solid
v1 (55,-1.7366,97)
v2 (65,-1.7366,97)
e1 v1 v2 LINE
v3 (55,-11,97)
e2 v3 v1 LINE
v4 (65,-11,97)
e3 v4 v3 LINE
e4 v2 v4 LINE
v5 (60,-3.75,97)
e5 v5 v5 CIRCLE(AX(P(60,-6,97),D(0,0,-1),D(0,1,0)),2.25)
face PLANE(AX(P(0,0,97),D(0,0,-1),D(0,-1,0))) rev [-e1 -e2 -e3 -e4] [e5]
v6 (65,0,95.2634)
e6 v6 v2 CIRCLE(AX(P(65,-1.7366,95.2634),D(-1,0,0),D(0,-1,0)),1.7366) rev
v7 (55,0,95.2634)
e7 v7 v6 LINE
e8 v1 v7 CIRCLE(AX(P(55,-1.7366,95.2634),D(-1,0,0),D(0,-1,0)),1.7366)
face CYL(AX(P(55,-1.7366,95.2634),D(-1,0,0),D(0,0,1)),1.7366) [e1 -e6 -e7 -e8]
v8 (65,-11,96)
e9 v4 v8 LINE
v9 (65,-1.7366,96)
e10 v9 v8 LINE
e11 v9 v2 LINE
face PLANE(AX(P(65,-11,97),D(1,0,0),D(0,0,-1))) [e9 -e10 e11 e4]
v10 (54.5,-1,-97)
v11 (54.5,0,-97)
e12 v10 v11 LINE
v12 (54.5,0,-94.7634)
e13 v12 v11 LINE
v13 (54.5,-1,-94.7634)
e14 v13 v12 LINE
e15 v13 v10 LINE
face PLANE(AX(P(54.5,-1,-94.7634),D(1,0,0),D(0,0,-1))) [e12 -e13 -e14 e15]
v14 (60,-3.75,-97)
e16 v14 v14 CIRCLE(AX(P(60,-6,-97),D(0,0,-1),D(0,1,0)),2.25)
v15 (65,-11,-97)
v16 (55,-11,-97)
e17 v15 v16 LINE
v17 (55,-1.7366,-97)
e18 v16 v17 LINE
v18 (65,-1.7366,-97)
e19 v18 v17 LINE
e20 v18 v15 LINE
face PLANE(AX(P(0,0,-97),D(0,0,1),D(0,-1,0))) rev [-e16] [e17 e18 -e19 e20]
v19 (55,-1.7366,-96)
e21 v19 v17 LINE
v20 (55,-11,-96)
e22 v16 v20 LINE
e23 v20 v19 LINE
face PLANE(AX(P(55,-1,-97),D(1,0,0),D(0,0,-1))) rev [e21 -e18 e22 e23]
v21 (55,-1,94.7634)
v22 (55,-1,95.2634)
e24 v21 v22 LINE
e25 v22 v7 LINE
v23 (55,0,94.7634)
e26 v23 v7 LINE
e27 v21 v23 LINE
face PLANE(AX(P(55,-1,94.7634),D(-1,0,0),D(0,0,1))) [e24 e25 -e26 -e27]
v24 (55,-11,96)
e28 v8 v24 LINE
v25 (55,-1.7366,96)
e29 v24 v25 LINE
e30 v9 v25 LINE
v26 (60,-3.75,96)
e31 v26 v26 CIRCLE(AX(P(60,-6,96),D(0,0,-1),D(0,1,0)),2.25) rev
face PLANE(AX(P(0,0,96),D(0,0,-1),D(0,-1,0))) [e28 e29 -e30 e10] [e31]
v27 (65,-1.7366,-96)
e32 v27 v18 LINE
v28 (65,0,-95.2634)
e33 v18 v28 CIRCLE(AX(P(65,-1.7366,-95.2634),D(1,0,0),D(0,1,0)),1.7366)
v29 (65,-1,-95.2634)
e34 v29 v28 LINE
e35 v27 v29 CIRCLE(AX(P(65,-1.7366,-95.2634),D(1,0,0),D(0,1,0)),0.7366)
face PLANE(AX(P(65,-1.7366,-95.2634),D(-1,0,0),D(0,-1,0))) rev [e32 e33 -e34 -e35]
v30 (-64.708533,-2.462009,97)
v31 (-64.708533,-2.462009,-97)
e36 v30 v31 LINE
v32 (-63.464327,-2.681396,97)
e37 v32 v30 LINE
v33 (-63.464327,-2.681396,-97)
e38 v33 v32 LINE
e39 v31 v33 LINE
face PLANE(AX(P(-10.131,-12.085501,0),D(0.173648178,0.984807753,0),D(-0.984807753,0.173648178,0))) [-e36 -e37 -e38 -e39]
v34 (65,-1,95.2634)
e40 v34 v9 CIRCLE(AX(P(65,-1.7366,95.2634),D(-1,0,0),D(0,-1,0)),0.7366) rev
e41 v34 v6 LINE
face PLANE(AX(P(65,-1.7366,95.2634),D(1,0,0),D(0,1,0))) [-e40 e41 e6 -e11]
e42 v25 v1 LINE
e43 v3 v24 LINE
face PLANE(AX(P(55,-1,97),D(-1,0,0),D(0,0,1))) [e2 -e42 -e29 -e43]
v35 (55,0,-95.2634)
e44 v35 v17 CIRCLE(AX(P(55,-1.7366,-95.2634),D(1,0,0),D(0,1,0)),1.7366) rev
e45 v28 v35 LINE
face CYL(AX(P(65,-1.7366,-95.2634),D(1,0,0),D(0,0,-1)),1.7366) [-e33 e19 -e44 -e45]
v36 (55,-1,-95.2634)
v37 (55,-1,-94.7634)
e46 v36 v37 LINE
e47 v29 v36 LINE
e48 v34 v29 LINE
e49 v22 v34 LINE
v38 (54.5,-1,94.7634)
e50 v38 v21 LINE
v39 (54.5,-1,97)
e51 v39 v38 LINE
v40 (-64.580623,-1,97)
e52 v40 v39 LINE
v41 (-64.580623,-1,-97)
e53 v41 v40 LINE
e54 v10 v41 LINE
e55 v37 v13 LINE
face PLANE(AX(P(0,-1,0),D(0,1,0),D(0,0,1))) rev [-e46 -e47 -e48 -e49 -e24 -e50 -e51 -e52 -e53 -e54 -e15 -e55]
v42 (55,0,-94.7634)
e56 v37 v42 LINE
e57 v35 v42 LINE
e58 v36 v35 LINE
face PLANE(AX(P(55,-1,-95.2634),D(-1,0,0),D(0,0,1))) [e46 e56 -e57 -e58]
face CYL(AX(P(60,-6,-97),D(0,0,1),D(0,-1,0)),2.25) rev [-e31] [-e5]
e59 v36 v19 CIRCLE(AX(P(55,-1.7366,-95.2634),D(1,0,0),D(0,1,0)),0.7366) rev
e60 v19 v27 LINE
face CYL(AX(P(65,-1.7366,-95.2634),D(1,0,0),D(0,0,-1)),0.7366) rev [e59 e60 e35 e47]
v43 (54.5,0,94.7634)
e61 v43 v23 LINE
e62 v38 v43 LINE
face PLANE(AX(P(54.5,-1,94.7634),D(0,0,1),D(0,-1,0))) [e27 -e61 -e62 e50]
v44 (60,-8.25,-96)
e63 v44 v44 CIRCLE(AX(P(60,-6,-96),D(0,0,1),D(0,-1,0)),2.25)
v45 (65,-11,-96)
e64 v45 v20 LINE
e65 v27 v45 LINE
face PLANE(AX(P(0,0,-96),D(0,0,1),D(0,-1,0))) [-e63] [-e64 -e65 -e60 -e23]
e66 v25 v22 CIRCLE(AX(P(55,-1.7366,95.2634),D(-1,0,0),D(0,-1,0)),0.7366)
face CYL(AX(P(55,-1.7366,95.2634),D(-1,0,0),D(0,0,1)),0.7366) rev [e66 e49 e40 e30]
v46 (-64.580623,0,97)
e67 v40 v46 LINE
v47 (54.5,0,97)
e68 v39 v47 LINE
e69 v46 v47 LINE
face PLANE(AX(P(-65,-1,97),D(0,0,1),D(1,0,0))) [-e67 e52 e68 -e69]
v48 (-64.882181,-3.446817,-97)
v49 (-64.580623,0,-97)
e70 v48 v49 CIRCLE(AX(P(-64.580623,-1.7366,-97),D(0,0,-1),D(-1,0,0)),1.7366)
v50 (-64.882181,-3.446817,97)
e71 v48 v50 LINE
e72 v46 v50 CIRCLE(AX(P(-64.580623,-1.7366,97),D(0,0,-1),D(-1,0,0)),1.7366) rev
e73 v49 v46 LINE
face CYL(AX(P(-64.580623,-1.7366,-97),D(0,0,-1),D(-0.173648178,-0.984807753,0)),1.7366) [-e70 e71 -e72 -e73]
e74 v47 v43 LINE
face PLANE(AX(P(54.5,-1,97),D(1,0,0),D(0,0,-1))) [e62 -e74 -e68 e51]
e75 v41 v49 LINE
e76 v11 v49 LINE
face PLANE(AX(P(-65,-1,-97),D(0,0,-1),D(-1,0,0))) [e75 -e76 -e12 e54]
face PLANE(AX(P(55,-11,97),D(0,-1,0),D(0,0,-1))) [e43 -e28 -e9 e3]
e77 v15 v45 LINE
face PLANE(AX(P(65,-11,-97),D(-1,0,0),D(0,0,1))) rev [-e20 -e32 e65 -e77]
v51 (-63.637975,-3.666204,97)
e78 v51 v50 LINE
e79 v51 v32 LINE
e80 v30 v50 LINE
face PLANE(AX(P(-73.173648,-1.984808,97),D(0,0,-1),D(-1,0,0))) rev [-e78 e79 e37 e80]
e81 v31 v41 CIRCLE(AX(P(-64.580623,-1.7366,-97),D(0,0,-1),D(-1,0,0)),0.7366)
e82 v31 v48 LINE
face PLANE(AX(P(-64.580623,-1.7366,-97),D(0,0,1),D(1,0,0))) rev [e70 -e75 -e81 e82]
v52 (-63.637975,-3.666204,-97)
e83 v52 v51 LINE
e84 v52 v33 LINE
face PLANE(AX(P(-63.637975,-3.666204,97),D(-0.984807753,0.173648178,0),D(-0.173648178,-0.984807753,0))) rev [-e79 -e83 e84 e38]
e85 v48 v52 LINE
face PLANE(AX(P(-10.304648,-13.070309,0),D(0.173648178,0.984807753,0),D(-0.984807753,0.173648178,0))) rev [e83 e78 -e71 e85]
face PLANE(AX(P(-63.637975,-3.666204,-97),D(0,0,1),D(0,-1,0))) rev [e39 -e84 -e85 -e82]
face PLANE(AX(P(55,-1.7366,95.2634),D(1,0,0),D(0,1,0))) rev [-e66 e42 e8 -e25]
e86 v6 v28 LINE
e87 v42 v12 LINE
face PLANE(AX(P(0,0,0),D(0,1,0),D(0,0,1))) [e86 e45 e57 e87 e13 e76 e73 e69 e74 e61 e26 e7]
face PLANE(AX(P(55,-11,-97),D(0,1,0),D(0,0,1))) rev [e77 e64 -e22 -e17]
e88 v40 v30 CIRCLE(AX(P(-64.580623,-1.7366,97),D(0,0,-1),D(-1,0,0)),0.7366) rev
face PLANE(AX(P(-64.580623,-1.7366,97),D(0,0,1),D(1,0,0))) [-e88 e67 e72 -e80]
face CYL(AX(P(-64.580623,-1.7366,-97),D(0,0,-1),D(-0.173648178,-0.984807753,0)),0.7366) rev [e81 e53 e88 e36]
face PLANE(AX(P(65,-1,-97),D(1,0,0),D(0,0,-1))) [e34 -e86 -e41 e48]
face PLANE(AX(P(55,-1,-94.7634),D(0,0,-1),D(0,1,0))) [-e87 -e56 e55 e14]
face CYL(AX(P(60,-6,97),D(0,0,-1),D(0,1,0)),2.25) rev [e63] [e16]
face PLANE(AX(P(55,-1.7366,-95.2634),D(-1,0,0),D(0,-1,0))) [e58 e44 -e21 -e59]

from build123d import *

# Parameters (mm, degrees)
SKETCH1_W                     = 130
SKETCH1_H                     = 194
BASE_FLANGE1_DEPTH            = 1
EDGE_FLANGE1_STRIP_CUT_DEPTH  = 194
EDGE_FLANGE1_DEPTH            = 194
EDGE_FLANGE2_STRIP_W          = 5.4732
EDGE_FLANGE2_STRIP_H          = 1
EDGE_FLANGE2_STRIP_CUT_DEPTH  = 10
EDGE_FLANGE2_RELIEF_W         = 5.9732
EDGE_FLANGE2_RELIEF_H         = 0.5
EDGE_FLANGE2_RELIEF_CUT_DEPTH = 1
EDGE_FLANGE2_DEPTH            = 10
SKETCH14_R                    = 2.25
CUT_EXTRUDE1_DEPTH            = 206.316765339


# Sheet-metal steps are written as plain solids
with BuildPart() as part:
    # Sketch1 → Base-Flange1 (new body)
    with BuildSketch(Plane(origin=(0, 0, 0), x_dir=(1, 0, 0), z_dir=(0, 1, 0))):
        Rectangle(SKETCH1_W, SKETCH1_H)
    extrude(amount=-BASE_FLANGE1_DEPTH)

    # Edge-Flange1 strip (across the edge) → Edge-Flange1 strip cut (cut)
    with BuildSketch(Plane(origin=(-73, -1, 97), x_dir=(0.17364817766693103, 0.984807753012208, 0), z_dir=(0, 0, -1))):
        Polygon((-9.805618071, -61.369193981), (2.446817144, 8.117819101), (1.462009391, 8.291467279), (-10.790425824, -61.195545803), align=None)
    extrude(amount=EDGE_FLANGE1_STRIP_CUT_DEPTH, mode=Mode.SUBTRACT)

    # Edge-Flange1 section (across the edge) → Edge-Flange1 (add)
    with BuildSketch(Plane(origin=(-73, -1, 97), x_dir=(0.17364817766693103, 0.984807753012208, 0), z_dir=(0, 0, -1))):
        with BuildLine():
            Line((-1, 8.419376526), (-1, 9.682776526))
            Line((-1, 9.682776526), (0, 9.682776526))
            Line((0, 9.682776526), (0, 8.419376526))
            ThreePointArc((0, 8.419376526), (0.67240108, 7.685579512), (1.462009391, 8.291467279))
            Line((1.462009391, 8.291467279), (2.446817144, 8.117819101))
            ThreePointArc((2.446817144, 8.117819101), (0.585245337, 6.689384814), (-1, 8.419376526))
        make_face()
    extrude(amount=EDGE_FLANGE1_DEPTH)

    # Edge-Flange2 strip (across the edge) → Edge-Flange2 strip cut (cut)
    with BuildSketch(Plane(origin=(55, -1, -97), x_dir=(0, 0, 1), z_dir=(1, 0, 0))):
        with Locations((-1, -0.5)):
            Rectangle(EDGE_FLANGE2_STRIP_W, EDGE_FLANGE2_STRIP_H)
    edge_flange2_strip_cut = extrude(amount=EDGE_FLANGE2_STRIP_CUT_DEPTH, mode=Mode.SUBTRACT)

    # Edge-Flange2 relief (on the sheet) → Edge-Flange2 relief cut (cut)
    with BuildSketch(Plane(origin=(55, -1, -95.2634), x_dir=(0, 0, 1), z_dir=(0, -1, 0))):
        with Locations((-2.4866, 0.25)):
            Rectangle(EDGE_FLANGE2_RELIEF_W, EDGE_FLANGE2_RELIEF_H)
    edge_flange2_relief_cut = extrude(amount=-EDGE_FLANGE2_RELIEF_CUT_DEPTH, mode=Mode.SUBTRACT)

    # Edge-Flange2 section (across the edge) → Edge-Flange2 (add)
    with BuildSketch(Plane(origin=(55, -1, -97), x_dir=(0, 0, 1), z_dir=(1, 0, 0))):
        with BuildLine():
            Line((0, 0.7366), (0, 10))
            Line((0, 10), (1, 10))
            Line((1, 10), (1, 0.7366))
            ThreePointArc((1, 0.7366), (1.215745145, 0.215745145), (1.7366, 0))
            Line((1.7366, 0), (1.7366, -1))
            ThreePointArc((1.7366, -1), (0.508638364, -0.491361636), (0, 0.7366))
        make_face()
    edge_flange2 = extrude(amount=EDGE_FLANGE2_DEPTH)

    # Sketch14 → Cut-Extrude1 (cut, through all)
    with BuildSketch(Plane(origin=(0, 0, -97), x_dir=(-1, 0, 0), z_dir=(0, 0, -1))):
        with Locations(Location((-60, -6, 0), (0, 0, 90))):
            Circle(SKETCH14_R)
    cut_extrude1 = extrude(amount=-CUT_EXTRUDE1_DEPTH, mode=Mode.SUBTRACT)

    # Mirror1: Edge-Flange2 strip cut, Edge-Flange2 relief cut, Edge-Flange2, Cut-Extrude1 across plane
    add(edge_flange2_strip_cut.mirror(Plane.XY), mode=Mode.SUBTRACT)
    add(edge_flange2_relief_cut.mirror(Plane.XY), mode=Mode.SUBTRACT)
    add(edge_flange2.mirror(Plane.XY))
    add(cut_extrude1.mirror(Plane.XY), mode=Mode.SUBTRACT)


solid = part.part
